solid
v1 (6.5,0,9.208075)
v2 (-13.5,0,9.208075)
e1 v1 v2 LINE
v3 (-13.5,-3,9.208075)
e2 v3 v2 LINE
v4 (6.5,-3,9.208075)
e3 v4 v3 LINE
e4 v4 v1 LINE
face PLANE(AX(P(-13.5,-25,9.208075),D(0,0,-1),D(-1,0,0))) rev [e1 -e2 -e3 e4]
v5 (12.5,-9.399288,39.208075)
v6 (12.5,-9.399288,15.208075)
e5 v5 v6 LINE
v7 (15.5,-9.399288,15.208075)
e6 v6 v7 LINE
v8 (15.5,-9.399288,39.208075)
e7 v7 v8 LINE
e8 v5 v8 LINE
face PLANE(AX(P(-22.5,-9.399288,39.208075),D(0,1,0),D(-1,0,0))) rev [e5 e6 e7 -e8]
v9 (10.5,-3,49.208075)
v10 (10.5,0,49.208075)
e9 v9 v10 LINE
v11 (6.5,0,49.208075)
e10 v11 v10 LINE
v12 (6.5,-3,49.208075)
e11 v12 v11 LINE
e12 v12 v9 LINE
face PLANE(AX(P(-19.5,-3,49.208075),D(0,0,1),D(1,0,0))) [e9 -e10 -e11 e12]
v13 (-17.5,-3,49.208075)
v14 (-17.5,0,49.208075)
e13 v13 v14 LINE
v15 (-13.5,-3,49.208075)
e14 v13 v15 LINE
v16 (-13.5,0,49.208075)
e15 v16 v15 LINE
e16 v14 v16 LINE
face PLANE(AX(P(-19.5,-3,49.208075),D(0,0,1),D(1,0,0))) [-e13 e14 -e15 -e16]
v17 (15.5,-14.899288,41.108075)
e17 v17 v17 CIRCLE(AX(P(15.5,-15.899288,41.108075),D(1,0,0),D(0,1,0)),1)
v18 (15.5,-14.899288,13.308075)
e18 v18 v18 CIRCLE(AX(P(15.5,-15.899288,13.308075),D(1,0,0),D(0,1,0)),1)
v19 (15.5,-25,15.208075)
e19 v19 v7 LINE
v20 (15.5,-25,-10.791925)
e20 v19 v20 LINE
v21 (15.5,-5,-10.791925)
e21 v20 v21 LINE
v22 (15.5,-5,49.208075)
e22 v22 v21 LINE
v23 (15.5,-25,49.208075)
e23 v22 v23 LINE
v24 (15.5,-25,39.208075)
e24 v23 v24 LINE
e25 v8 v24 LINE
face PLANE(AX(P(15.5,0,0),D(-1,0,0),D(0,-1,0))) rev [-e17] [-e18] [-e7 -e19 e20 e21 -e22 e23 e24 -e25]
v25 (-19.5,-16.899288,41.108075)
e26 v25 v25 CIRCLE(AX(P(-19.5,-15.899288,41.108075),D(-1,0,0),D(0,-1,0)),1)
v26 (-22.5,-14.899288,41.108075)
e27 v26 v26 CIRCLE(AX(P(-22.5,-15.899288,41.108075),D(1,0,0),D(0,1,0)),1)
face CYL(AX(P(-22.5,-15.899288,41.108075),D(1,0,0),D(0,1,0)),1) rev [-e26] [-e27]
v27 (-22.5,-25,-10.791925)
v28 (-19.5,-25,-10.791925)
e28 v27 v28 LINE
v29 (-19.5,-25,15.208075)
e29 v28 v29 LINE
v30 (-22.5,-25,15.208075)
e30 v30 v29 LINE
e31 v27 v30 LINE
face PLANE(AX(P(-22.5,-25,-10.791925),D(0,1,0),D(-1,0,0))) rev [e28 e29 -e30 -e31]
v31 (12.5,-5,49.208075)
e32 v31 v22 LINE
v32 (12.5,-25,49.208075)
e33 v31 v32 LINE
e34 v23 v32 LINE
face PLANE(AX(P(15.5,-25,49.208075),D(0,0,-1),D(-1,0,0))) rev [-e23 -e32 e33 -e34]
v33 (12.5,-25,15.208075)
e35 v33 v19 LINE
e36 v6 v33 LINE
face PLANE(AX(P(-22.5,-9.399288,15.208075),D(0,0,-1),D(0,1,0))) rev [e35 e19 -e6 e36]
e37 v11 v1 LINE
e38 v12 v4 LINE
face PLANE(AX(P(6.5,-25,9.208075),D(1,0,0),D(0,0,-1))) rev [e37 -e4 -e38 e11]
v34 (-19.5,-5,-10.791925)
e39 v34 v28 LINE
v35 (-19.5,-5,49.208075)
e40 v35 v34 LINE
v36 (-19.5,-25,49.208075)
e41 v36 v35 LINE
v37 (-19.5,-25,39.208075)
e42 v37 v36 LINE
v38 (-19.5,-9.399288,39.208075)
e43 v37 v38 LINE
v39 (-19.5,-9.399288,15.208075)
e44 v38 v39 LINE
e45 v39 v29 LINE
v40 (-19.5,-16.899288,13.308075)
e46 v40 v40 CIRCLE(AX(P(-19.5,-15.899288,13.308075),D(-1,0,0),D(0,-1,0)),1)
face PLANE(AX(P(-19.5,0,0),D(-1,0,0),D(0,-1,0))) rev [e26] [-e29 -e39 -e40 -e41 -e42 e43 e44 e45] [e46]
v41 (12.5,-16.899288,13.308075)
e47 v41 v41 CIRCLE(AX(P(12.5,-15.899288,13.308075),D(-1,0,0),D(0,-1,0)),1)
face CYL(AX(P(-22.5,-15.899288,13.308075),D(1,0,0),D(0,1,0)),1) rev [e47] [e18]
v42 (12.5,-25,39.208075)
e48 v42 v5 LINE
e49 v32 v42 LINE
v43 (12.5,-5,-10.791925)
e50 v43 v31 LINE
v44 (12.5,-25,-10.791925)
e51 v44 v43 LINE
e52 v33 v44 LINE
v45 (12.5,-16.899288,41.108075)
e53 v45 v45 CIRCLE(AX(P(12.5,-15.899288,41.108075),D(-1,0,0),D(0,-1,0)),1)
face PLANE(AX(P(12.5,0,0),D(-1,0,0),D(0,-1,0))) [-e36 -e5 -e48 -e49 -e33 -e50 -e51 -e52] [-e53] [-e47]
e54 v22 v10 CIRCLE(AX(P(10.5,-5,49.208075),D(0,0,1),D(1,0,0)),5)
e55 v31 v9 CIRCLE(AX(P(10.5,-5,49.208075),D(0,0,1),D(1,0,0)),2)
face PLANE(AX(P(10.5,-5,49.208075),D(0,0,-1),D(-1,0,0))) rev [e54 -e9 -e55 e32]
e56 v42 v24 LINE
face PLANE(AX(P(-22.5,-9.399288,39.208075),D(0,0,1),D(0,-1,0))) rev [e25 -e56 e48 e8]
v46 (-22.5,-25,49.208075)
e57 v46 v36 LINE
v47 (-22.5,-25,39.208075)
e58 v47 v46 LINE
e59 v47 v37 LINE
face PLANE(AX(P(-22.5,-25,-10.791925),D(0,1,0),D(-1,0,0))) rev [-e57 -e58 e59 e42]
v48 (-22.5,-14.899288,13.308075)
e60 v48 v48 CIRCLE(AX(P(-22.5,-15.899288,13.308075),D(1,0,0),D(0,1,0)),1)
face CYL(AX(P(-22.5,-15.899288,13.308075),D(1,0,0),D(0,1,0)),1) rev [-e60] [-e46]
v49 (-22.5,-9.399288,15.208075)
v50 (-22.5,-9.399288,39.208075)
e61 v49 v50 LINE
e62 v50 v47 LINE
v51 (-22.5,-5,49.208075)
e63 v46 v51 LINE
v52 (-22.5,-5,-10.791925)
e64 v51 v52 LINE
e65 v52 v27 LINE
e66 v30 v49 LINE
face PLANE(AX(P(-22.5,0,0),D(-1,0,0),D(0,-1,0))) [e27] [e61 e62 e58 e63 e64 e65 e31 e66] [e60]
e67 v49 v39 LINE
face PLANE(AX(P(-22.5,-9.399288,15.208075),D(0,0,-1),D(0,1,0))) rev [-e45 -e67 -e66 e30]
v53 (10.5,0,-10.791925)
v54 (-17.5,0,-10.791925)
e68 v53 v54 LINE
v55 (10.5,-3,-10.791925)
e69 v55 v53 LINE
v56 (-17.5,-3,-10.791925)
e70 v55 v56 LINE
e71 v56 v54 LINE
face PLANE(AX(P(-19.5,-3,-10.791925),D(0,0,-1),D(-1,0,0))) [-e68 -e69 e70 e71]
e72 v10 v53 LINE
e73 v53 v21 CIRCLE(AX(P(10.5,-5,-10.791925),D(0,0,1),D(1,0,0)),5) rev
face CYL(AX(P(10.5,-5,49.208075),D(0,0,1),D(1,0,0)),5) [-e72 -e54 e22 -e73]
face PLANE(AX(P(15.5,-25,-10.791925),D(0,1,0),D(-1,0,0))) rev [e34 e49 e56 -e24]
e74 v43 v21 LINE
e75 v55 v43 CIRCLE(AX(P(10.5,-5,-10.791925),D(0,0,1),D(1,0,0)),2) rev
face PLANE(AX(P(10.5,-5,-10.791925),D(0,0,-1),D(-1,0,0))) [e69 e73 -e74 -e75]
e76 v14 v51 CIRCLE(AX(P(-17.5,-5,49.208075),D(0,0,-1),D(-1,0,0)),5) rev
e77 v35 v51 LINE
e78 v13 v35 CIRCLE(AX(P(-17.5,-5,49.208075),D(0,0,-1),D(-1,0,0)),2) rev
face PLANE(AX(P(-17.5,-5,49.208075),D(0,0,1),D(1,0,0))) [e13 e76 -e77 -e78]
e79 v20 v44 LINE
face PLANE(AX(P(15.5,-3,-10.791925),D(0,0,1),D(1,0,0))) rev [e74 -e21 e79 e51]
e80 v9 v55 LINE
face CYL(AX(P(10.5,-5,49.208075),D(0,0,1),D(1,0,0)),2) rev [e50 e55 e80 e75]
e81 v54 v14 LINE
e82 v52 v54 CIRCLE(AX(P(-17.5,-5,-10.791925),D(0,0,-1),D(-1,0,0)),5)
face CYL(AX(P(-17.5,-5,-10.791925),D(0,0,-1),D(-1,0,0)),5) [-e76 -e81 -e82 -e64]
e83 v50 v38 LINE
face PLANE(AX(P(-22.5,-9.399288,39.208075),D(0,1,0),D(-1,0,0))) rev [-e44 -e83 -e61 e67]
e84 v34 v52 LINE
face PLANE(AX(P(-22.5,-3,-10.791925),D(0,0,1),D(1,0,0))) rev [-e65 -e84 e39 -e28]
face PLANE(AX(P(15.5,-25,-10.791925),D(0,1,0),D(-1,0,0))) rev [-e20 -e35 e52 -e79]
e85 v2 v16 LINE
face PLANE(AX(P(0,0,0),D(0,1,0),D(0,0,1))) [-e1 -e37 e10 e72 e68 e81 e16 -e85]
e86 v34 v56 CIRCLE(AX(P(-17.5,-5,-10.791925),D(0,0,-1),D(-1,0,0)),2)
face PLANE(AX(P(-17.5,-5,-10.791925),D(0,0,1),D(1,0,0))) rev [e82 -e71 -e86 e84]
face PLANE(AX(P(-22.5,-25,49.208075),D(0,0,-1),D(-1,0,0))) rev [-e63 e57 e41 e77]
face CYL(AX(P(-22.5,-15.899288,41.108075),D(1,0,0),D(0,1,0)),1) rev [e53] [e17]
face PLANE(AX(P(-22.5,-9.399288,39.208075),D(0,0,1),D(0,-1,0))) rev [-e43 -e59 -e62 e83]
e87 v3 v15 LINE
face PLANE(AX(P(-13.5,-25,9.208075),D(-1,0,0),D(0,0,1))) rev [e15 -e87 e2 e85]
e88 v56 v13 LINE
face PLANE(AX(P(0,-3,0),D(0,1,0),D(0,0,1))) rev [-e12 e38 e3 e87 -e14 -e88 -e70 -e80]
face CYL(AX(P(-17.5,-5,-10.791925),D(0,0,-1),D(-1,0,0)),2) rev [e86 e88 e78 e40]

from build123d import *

# Parameters (mm, degrees)
SKETCH1_W                      = 32
SKETCH1_H                      = 60
BASE_FLANGE1_DEPTH             = 3
EDGE_FLANGE1_STRIP_W           = 16
EDGE_FLANGE1_STRIP_H           = 3
EDGE_FLANGE1_STRIP_CUT_DEPTH   = 60
EDGE_FLANGE1_STRIP_2_W         = 16
EDGE_FLANGE1_STRIP_2_H         = 3
EDGE_FLANGE1_STRIP_CUT_2_DEPTH = 60
EDGE_FLANGE1_DEPTH             = 60
EDGE_FLANGE1_BEND_DEPTH        = 60
SKETCH18_R                     = 1
SKETCH18_W                     = 24
SKETCH18_H                     = 13
CUT_EXTRUDE1_DEPTH             = 68.01070511
SKETCH19_W                     = 20
SKETCH19_H                     = 40
CUT_EXTRUDE2_DEPTH             = 60.604400839
SKETCH20_W                     = 24
SKETCH20_H                     = 2.600711811
CUT_EXTRUDE3_DEPTH             = 68.01070511


# Sheet-metal steps are written as plain solids
with BuildPart() as part:
    # Sketch1 → Base-Flange1 (new body)
    with BuildSketch(Plane(origin=(0, 0, 0), x_dir=(1, 0, 0), z_dir=(0, 1, 0))):
        with Locations((-3.5, -19.208074534)):
            Rectangle(SKETCH1_W, SKETCH1_H)
    extrude(amount=-BASE_FLANGE1_DEPTH)

    # Edge-Flange1 strip (across the edge) → Edge-Flange1 strip cut (cut)
    with BuildSketch(Plane(origin=(12.5, -3, -10.791925466), x_dir=(-1, 0, 0), z_dir=(0, 0, 1))):
        with Locations((-6, -1.5)):
            Rectangle(EDGE_FLANGE1_STRIP_W, EDGE_FLANGE1_STRIP_H)
    extrude(amount=EDGE_FLANGE1_STRIP_CUT_DEPTH, mode=Mode.SUBTRACT)

    # Edge-Flange1 strip 2 (across the edge) → Edge-Flange1 strip cut 2 (cut)
    with BuildSketch(Plane(origin=(-19.5, -3, 49.208074534), x_dir=(1, 0, 0), z_dir=(0, 0, -1))):
        with Locations((-6, -1.5)):
            Rectangle(EDGE_FLANGE1_STRIP_2_W, EDGE_FLANGE1_STRIP_2_H)
    extrude(amount=EDGE_FLANGE1_STRIP_CUT_2_DEPTH, mode=Mode.SUBTRACT)

    # Edge-Flange1 section (across the edge) → Edge-Flange1 (add)
    with BuildSketch(Plane(origin=(12.5, -3, -10.791925466), x_dir=(-1, 0, 0), z_dir=(0, 0, 1))):
        with BuildLine():
            Line((-3, 2), (-3, 22))
            Line((-3, 22), (0, 22))
            Line((0, 22), (0, 2))
            ThreePointArc((0, 2), (0.585786438, 0.585786438), (2, 0))
            Line((2, 0), (2, -3))
            ThreePointArc((2, -3), (-1.535533906, -1.535533906), (-3, 2))
        make_face()
    extrude(amount=EDGE_FLANGE1_DEPTH)

    # Edge-Flange1 section 2 (across the edge) → Edge-Flange1 bend (add)
    with BuildSketch(Plane(origin=(-19.5, -3, 49.208074534), x_dir=(1, 0, 0), z_dir=(0, 0, -1))):
        with BuildLine():
            Line((-3, 2), (-3, 22))
            Line((-3, 22), (0, 22))
            Line((0, 22), (0, 2))
            ThreePointArc((0, 2), (0.585786438, 0.585786438), (2, 0))
            Line((2, 0), (2, -3))
            ThreePointArc((2, -3), (-1.535533906, -1.535533906), (-3, 2))
        make_face()
    extrude(amount=EDGE_FLANGE1_BEND_DEPTH)

    # Sketch18 → Cut-Extrude1 (cut, through all)
    with BuildSketch(Plane(origin=(15.5, 0, 0), x_dir=(0, 0, -1), z_dir=(1, 0, 0))):
        with Locations(Location((-41.108074534, -15.899288189, 0), (0, 0, 90))):
            Circle(SKETCH18_R)
        with Locations(Location((-13.308074534, -15.899288189, 0), (0, 0, 90))):
            Circle(SKETCH18_R)
        with Locations((-27.208074534, -15.899288189)):
            Rectangle(SKETCH18_W, SKETCH18_H)
    extrude(amount=-CUT_EXTRUDE1_DEPTH, mode=Mode.SUBTRACT)

    # Sketch19 → Cut-Extrude2 (cut, through all)
    with BuildSketch(Plane(origin=(0, 0, 0), x_dir=(1, 0, 0), z_dir=(0, 1, 0))):
        with Locations((-3.5, -29.208074534)):
            Rectangle(SKETCH19_W, SKETCH19_H)
    extrude(amount=-CUT_EXTRUDE2_DEPTH, mode=Mode.SUBTRACT)

    # Sketch20 → Cut-Extrude3 (cut, through all)
    with BuildSketch(Plane(origin=(15.5, 0, 0), x_dir=(0, 0, -1), z_dir=(1, 0, 0))):
        with Locations((-27.208074534, -23.699644095)):
            Rectangle(SKETCH20_W, SKETCH20_H)
    extrude(amount=-CUT_EXTRUDE3_DEPTH, mode=Mode.SUBTRACT)


solid = part.part
